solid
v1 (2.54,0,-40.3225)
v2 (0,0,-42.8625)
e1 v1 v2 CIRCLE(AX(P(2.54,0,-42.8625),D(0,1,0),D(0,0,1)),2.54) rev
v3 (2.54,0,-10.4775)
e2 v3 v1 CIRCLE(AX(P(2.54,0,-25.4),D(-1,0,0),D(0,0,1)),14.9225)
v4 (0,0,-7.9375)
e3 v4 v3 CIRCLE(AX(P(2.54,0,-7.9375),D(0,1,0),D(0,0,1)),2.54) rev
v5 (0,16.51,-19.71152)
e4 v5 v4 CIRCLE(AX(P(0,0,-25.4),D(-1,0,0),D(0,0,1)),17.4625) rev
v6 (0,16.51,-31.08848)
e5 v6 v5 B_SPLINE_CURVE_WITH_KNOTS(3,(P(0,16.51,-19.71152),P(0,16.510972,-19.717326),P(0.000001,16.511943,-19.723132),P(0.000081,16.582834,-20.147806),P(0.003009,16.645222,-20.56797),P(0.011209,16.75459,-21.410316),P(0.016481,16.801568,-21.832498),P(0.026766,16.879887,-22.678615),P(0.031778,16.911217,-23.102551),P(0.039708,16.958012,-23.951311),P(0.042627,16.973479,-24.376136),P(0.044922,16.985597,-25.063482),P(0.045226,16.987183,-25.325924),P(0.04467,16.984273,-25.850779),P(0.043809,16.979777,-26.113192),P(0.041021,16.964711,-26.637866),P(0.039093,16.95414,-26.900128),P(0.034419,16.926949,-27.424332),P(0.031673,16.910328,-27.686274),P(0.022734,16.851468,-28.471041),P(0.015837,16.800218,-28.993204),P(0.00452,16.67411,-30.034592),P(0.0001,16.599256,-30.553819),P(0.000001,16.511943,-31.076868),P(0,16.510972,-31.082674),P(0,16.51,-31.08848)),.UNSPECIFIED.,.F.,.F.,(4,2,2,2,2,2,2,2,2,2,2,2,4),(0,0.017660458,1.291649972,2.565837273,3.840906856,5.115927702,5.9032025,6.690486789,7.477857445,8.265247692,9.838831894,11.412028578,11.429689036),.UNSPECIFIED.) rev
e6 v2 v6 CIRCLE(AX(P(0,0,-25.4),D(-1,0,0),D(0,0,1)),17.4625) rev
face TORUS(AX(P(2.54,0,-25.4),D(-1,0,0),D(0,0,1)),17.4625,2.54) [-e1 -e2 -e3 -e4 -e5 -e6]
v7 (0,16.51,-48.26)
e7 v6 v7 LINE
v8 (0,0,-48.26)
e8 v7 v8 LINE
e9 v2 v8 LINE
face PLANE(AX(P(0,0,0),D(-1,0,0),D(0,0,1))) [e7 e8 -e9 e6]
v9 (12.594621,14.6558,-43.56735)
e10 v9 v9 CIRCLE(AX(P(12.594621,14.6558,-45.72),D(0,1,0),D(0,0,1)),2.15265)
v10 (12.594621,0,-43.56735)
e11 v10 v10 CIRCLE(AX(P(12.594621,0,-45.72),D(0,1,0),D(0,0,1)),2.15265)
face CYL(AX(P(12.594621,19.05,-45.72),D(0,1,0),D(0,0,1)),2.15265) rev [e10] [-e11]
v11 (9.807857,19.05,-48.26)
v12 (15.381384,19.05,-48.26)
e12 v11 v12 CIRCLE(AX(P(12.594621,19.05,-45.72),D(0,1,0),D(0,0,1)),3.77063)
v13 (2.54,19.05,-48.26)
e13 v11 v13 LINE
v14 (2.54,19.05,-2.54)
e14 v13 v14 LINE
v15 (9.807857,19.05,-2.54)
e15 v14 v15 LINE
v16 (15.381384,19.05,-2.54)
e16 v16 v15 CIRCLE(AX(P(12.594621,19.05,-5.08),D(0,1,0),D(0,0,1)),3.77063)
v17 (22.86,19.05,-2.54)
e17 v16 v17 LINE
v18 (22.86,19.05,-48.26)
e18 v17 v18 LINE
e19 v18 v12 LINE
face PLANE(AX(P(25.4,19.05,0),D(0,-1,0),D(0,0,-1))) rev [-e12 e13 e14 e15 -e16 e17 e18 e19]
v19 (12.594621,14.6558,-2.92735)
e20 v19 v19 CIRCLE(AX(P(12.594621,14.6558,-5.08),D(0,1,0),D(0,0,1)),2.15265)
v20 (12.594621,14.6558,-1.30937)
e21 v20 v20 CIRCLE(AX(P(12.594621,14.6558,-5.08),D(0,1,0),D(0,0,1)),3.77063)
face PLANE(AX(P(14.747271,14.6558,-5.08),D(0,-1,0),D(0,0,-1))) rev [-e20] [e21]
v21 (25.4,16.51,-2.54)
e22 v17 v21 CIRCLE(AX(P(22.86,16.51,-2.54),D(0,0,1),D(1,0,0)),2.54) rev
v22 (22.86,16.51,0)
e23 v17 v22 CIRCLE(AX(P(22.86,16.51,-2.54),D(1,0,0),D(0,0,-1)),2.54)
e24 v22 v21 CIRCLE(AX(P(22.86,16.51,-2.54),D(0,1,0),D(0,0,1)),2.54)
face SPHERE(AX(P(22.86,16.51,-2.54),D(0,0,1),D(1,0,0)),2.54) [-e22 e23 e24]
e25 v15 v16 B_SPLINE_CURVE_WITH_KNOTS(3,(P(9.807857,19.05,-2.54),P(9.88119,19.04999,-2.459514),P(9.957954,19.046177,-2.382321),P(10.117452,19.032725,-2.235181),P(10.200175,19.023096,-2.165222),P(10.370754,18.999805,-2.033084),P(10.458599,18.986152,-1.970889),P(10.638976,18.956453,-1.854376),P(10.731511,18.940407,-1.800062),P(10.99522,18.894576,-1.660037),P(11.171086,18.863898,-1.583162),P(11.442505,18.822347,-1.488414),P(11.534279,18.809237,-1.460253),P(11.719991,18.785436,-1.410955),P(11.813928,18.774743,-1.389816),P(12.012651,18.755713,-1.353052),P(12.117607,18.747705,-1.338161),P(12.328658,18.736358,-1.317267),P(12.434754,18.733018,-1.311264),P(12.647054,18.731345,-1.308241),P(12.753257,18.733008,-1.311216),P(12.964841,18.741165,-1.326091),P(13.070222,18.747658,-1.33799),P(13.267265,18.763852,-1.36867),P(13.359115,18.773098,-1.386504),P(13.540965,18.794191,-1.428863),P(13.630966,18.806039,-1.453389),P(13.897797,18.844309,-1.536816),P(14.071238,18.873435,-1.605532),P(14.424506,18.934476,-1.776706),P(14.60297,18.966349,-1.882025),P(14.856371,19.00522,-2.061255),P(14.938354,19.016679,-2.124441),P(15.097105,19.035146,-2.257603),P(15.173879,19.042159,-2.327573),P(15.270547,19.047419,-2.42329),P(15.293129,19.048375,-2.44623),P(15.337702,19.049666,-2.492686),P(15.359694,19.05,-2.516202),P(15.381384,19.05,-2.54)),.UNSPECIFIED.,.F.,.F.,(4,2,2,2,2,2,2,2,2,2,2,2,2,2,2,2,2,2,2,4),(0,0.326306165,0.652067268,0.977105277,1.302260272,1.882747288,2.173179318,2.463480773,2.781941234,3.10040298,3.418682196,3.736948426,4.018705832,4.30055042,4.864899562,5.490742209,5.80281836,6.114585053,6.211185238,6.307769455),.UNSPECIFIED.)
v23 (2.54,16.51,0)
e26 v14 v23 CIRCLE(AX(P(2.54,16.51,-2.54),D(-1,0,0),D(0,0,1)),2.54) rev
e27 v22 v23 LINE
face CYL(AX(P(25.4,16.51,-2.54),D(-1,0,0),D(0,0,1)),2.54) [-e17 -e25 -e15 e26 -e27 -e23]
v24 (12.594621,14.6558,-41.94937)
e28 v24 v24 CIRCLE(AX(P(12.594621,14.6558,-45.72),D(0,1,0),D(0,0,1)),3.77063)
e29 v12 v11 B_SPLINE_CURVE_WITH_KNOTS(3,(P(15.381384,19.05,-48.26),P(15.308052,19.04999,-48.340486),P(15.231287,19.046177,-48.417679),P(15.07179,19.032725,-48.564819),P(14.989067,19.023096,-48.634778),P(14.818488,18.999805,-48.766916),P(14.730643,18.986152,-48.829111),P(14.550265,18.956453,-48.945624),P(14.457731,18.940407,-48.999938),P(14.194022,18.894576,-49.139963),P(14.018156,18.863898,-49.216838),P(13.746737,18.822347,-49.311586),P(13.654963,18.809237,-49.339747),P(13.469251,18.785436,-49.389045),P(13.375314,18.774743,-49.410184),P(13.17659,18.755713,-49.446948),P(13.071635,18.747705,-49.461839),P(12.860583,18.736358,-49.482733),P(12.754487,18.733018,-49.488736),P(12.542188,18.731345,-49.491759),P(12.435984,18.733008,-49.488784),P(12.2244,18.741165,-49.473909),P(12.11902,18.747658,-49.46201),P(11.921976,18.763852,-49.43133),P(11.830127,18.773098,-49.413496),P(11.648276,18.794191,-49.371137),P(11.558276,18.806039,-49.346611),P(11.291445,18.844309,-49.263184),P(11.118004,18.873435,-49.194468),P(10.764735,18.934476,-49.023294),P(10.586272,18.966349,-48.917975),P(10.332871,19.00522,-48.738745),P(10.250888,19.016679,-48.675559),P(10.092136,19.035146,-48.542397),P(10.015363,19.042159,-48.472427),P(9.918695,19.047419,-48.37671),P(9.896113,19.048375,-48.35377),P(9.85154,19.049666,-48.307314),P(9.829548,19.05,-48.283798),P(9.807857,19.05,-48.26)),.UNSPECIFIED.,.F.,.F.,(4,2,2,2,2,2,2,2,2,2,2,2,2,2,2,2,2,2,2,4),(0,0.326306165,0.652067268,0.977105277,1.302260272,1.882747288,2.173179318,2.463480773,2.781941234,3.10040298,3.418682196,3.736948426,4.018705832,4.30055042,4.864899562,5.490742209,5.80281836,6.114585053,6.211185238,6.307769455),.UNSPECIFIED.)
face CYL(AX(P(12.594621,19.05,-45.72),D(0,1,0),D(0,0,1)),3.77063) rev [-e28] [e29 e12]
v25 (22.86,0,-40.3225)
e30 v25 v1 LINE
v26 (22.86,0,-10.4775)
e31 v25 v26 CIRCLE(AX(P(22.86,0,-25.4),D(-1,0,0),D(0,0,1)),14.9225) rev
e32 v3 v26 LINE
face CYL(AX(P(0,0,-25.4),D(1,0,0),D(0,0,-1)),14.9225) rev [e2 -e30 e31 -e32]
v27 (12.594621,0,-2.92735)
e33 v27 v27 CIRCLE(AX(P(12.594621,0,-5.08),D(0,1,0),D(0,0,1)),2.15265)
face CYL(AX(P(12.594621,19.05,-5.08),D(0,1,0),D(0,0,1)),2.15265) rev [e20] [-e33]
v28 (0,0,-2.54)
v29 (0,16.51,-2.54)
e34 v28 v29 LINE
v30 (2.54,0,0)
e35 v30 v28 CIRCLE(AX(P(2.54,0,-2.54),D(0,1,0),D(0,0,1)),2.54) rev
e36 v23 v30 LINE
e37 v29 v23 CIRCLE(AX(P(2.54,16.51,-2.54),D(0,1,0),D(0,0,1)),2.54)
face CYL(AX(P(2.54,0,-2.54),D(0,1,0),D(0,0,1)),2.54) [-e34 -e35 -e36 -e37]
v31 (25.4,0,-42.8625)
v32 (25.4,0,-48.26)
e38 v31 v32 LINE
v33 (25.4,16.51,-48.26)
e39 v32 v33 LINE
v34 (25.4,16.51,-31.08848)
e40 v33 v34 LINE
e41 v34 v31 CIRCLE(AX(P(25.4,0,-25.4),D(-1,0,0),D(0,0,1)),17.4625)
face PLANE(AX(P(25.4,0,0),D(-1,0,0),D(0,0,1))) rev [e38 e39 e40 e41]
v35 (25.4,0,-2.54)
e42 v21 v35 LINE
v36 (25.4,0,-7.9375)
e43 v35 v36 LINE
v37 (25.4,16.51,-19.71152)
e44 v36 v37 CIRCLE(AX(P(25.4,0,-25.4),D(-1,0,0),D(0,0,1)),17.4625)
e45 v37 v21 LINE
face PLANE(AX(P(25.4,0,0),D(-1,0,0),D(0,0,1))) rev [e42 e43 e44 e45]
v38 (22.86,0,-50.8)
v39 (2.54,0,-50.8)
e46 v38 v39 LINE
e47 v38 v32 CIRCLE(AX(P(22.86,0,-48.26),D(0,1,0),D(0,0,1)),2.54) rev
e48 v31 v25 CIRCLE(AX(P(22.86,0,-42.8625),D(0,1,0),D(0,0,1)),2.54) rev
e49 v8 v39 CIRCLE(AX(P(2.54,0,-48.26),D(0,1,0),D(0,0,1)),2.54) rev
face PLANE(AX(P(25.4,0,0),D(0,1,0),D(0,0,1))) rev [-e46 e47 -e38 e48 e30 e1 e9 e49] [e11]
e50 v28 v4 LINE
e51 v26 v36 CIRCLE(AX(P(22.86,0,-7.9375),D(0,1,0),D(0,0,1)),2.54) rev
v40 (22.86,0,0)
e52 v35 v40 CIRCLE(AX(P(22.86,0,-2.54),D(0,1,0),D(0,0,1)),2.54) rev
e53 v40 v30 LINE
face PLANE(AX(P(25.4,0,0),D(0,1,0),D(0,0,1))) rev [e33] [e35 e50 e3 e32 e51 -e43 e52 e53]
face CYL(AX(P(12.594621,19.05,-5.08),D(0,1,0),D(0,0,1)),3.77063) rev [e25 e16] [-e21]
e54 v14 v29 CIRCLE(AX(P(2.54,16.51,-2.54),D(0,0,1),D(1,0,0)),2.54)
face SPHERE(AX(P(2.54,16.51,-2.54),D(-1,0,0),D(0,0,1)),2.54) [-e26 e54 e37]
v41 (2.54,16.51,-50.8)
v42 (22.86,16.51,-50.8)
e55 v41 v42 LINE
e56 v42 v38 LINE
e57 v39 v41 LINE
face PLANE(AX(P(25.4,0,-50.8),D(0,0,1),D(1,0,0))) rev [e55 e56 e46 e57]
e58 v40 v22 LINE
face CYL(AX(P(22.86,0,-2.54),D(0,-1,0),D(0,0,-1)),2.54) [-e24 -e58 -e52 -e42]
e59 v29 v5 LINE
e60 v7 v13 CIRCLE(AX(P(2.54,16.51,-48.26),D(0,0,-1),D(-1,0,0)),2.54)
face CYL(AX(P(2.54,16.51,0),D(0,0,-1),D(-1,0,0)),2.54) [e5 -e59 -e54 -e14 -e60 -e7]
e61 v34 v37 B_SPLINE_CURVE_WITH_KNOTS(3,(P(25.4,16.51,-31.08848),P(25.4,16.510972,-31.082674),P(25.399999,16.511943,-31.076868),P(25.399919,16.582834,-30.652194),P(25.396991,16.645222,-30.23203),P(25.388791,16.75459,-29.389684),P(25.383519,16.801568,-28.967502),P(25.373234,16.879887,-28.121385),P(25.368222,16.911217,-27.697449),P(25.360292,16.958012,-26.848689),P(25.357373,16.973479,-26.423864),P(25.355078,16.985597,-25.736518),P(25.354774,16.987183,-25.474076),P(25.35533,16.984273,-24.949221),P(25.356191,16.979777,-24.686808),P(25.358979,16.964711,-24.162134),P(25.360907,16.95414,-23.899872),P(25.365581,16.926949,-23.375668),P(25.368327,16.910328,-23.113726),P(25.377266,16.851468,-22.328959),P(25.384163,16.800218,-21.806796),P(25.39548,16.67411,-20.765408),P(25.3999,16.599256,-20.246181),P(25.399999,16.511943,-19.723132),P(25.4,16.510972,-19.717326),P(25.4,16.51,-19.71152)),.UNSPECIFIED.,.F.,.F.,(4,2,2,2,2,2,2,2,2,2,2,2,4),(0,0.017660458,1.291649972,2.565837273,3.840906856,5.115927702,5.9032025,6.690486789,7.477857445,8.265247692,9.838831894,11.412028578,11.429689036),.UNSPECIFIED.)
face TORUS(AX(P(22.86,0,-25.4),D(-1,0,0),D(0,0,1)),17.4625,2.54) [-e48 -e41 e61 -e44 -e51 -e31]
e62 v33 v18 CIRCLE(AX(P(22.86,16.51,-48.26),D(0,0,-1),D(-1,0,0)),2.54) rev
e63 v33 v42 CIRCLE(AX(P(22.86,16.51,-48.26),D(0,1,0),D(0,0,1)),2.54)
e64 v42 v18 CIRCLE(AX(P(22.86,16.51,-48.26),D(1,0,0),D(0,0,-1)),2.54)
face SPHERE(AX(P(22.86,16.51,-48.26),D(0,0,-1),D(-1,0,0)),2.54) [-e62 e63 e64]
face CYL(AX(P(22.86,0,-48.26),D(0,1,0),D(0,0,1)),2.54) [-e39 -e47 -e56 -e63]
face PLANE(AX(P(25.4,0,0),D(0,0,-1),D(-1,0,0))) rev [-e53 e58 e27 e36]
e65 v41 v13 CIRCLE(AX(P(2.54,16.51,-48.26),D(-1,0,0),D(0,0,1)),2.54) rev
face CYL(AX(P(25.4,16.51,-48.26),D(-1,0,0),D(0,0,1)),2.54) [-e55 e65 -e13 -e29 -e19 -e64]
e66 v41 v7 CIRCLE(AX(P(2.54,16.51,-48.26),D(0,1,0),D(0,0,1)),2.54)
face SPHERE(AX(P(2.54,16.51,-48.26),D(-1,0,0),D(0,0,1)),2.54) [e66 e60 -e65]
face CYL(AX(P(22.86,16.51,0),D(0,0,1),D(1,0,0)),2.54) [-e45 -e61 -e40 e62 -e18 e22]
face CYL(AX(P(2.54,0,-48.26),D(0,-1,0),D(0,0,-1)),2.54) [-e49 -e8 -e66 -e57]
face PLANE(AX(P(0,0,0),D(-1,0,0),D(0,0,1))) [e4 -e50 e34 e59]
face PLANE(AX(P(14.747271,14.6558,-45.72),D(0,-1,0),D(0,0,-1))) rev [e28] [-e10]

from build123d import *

# Parameters (mm, degrees)
SKETCH1_W                                      = 50.8
SKETCH1_H                                      = 19.05
BOSS_EXTRUDE1_DEPTH                            = 25.4
SKETCH2_R                                      = 14.9225
CUT_EXTRUDE1_DEPTH                             = 60.905780189
CBORE_FOR_6_BUTTON_HEAD_CAP_SCREW1_D           = 4.3053
CBORE_FOR_6_BUTTON_HEAD_CAP_SCREW1_CBORE_D     = 7.54126
CBORE_FOR_6_BUTTON_HEAD_CAP_SCREW1_CBORE_DEPTH = 4.3942
FILLET1_R                                      = 2.54


with BuildPart() as part:
    # Sketch1 → Boss-Extrude1 (new body)
    with BuildSketch(Plane(origin=(0, 0, 0), x_dir=(0, 0, -1), z_dir=(1, 0, 0))):
        with Locations((25.4, 9.525)):
            Rectangle(SKETCH1_W, SKETCH1_H)
    extrude(amount=BOSS_EXTRUDE1_DEPTH)

    # Sketch2 → Cut-Extrude1 (cut, through all)
    with BuildSketch(Plane(origin=(25.4, 0, 0), x_dir=(0, 0, -1), z_dir=(1, 0, 0))):
        with Locations((25.4, 0)):
            Circle(SKETCH2_R)
    extrude(amount=-CUT_EXTRUDE1_DEPTH, mode=Mode.SUBTRACT)

    # CBORE for #6 Button Head Cap Screw1 (through all)
    with Locations(Plane(origin=(0, 19.05, 0), x_dir=(1, 0, 0), z_dir=(0, 1, 0))):
        with Locations((12.594620829, 5.08), (12.594620829, 45.72)):
            CounterBoreHole(CBORE_FOR_6_BUTTON_HEAD_CAP_SCREW1_D / 2, CBORE_FOR_6_BUTTON_HEAD_CAP_SCREW1_CBORE_D / 2, CBORE_FOR_6_BUTTON_HEAD_CAP_SCREW1_CBORE_DEPTH)

    # Fillet1
    # the kernel refuses this fillet: 2.54 mm, written as the material it takes off along each edge
    with BuildSketch(Plane(origin=(22.86, 16.51, -48.26), x_dir=(0, 1, 0), z_dir=(1, 0, 0))) as fillet1_piece_1_section:
        Polygon((0, 0), (FILLET1_R, 0), (FILLET1_R, -FILLET1_R), (0, -FILLET1_R), align=None)
    fillet1_piece_1 = extrude(amount=FILLET1_R, mode=Mode.PRIVATE)
    fillet1_piece_1 = fillet1_piece_1 - Plane(origin=(22.86, 16.51, -48.26), x_dir=(0, -0.7071067811865475, 0.7071067811865475), z_dir=(1, 0, 0)) * Sphere(FILLET1_R, mode=Mode.PRIVATE)
    add(fillet1_piece_1, mode=Mode.SUBTRACT)
    with BuildSketch(Plane(origin=(22.86, 16.51, -2.54), x_dir=(1, 0, 0), z_dir=(0, 0, 1))) as fillet1_piece_2_section:
        Polygon((0, 0), (FILLET1_R, 0), (FILLET1_R, FILLET1_R), (0, FILLET1_R), align=None)
    fillet1_piece_2 = extrude(amount=FILLET1_R, mode=Mode.PRIVATE)
    fillet1_piece_2 = fillet1_piece_2 - Plane(origin=(22.86, 16.51, -2.54), x_dir=(-0.7071067811865475, -0.7071067811865475, 0), z_dir=(0, 0, 1)) * Sphere(FILLET1_R, mode=Mode.PRIVATE)
    add(fillet1_piece_2, mode=Mode.SUBTRACT)
    with BuildSketch(Plane(origin=(2.54, 16.51, -48.26), x_dir=(0, 1, 0), z_dir=(-1, 0, 0))) as fillet1_piece_3_section:
        Polygon((0, 0), (FILLET1_R, 0), (FILLET1_R, FILLET1_R), (0, FILLET1_R), align=None)
    fillet1_piece_3 = extrude(amount=FILLET1_R, mode=Mode.PRIVATE)
    fillet1_piece_3 = fillet1_piece_3 - Plane(origin=(2.54, 16.51, -48.26), x_dir=(0, -0.7071067811865475, 0.7071067811865475), z_dir=(-1, 0, 0)) * Sphere(FILLET1_R, mode=Mode.PRIVATE)
    add(fillet1_piece_3, mode=Mode.SUBTRACT)
    with BuildSketch(Plane(origin=(2.54, 16.51, -2.54), x_dir=(0, 0, 1), z_dir=(-1, 0, 0))) as fillet1_piece_4_section:
        Polygon((0, 0), (FILLET1_R, 0), (FILLET1_R, FILLET1_R), (0, FILLET1_R), align=None)
    fillet1_piece_4 = extrude(amount=FILLET1_R, mode=Mode.PRIVATE)
    fillet1_piece_4 = fillet1_piece_4 - Plane(origin=(2.54, 16.51, -2.54), x_dir=(0, -0.7071067811865475, -0.7071067811865475), z_dir=(-1, 0, 0)) * Sphere(FILLET1_R, mode=Mode.PRIVATE)
    add(fillet1_piece_4, mode=Mode.SUBTRACT)
    with BuildSketch(Plane(origin=(25.4, -6.35, -50.8), x_dir=(0, 0, 1), z_dir=(0, 1, 0))) as fillet1_piece_5:
        with BuildLine():
            CenterArc((FILLET1_R, -FILLET1_R), FILLET1_R, 90, 90)
            Line((0, -FILLET1_R), (0, 0))
            Line((0, 0), (FILLET1_R, 0))
        make_face()
    extrude(amount=22.86, mode=Mode.SUBTRACT)
    with BuildSketch(Plane(origin=(25.4, 19.05, -48.26), x_dir=(0, -1, 0), z_dir=(0, 0, 1))) as fillet1_piece_6:
        with BuildLine():
            CenterArc((FILLET1_R, -FILLET1_R), FILLET1_R, 90, 90)
            Line((0, -FILLET1_R), (0, 0))
            Line((0, 0), (FILLET1_R, 0))
        make_face()
    extrude(amount=45.72, mode=Mode.SUBTRACT)
    with BuildSketch(Plane(origin=(25.4, 0, -25.4), x_dir=(0, -0.413428527977308, -0.9105365738148667), z_dir=(0, -0.9105365738148667, 0.413428527977308))) as fillet1_piece_7:
        with BuildLine():
            CenterArc((14.9225 + FILLET1_R, -FILLET1_R), FILLET1_R, 90, 90)
            Line((14.9225 + FILLET1_R, 0), (14.9225, 0))
            Line((14.9225, 0), (14.9225, -FILLET1_R))
        make_face()
    revolve(axis=Axis((25.4, 0, -25.4), (1, 0, 0)), revolution_arc=228.840784647, mode=Mode.SUBTRACT)
    with BuildSketch(Plane(origin=(0, 0, -25.4), x_dir=(0, -0.413428527977308, -0.9105365738148667), z_dir=(0, -0.9105365738148667, 0.413428527977308))) as fillet1_piece_8:
        with BuildLine():
            CenterArc((14.9225 + FILLET1_R, FILLET1_R), FILLET1_R, 180, 90)
            Line((14.9225, FILLET1_R), (14.9225, 0))
            Line((14.9225, 0), (14.9225 + FILLET1_R, 0))
        make_face()
    revolve(axis=Axis((0, 0, -25.4), (1, 0, 0)), revolution_arc=228.840784647, mode=Mode.SUBTRACT)
    with BuildSketch(Plane(origin=(25.4, 16.51, 0), x_dir=(-1, 0, 0), z_dir=(0, -1, 0)), Plane(origin=(0, -6.35, -50.8), x_dir=(0, 0, 1), z_dir=(0, 1, 0)), Plane(origin=(0, 16.51, 0), x_dir=(0, 0, -1), z_dir=(0, -1, 0))) as fillet1_piece_9:
        with BuildLine():
            CenterArc((FILLET1_R, FILLET1_R), FILLET1_R, 180, 90)
            Line((0, FILLET1_R), (0, 0))
            Line((0, 0), (FILLET1_R, 0))
        make_face()
    extrude(amount=22.86, mode=Mode.SUBTRACT)
    with BuildSketch(Plane(origin=(0, 19.05, -48.26), x_dir=(0, -1, 0), z_dir=(0, 0, 1))) as fillet1_piece_10:
        with BuildLine():
            CenterArc((FILLET1_R, FILLET1_R), FILLET1_R, 180, 90)
            Line((0, FILLET1_R), (0, 0))
            Line((0, 0), (FILLET1_R, 0))
        make_face()
    extrude(amount=45.72, mode=Mode.SUBTRACT)
    with BuildSketch(Plane(origin=(2.54, 19.05, 0), x_dir=(0, -1, 0), z_dir=(1, 0, 0)), Plane(origin=(2.54, 19.05, -50.8), x_dir=(0, 0, 1), z_dir=(1, 0, 0))) as fillet1_piece_11:
        with BuildLine():
            CenterArc((FILLET1_R, FILLET1_R), FILLET1_R, 180, 90)
            Line((0, FILLET1_R), (0, 0))
            Line((0, 0), (FILLET1_R, 0))
        make_face()
    extrude(amount=20.32, mode=Mode.SUBTRACT)


solid = part.part
